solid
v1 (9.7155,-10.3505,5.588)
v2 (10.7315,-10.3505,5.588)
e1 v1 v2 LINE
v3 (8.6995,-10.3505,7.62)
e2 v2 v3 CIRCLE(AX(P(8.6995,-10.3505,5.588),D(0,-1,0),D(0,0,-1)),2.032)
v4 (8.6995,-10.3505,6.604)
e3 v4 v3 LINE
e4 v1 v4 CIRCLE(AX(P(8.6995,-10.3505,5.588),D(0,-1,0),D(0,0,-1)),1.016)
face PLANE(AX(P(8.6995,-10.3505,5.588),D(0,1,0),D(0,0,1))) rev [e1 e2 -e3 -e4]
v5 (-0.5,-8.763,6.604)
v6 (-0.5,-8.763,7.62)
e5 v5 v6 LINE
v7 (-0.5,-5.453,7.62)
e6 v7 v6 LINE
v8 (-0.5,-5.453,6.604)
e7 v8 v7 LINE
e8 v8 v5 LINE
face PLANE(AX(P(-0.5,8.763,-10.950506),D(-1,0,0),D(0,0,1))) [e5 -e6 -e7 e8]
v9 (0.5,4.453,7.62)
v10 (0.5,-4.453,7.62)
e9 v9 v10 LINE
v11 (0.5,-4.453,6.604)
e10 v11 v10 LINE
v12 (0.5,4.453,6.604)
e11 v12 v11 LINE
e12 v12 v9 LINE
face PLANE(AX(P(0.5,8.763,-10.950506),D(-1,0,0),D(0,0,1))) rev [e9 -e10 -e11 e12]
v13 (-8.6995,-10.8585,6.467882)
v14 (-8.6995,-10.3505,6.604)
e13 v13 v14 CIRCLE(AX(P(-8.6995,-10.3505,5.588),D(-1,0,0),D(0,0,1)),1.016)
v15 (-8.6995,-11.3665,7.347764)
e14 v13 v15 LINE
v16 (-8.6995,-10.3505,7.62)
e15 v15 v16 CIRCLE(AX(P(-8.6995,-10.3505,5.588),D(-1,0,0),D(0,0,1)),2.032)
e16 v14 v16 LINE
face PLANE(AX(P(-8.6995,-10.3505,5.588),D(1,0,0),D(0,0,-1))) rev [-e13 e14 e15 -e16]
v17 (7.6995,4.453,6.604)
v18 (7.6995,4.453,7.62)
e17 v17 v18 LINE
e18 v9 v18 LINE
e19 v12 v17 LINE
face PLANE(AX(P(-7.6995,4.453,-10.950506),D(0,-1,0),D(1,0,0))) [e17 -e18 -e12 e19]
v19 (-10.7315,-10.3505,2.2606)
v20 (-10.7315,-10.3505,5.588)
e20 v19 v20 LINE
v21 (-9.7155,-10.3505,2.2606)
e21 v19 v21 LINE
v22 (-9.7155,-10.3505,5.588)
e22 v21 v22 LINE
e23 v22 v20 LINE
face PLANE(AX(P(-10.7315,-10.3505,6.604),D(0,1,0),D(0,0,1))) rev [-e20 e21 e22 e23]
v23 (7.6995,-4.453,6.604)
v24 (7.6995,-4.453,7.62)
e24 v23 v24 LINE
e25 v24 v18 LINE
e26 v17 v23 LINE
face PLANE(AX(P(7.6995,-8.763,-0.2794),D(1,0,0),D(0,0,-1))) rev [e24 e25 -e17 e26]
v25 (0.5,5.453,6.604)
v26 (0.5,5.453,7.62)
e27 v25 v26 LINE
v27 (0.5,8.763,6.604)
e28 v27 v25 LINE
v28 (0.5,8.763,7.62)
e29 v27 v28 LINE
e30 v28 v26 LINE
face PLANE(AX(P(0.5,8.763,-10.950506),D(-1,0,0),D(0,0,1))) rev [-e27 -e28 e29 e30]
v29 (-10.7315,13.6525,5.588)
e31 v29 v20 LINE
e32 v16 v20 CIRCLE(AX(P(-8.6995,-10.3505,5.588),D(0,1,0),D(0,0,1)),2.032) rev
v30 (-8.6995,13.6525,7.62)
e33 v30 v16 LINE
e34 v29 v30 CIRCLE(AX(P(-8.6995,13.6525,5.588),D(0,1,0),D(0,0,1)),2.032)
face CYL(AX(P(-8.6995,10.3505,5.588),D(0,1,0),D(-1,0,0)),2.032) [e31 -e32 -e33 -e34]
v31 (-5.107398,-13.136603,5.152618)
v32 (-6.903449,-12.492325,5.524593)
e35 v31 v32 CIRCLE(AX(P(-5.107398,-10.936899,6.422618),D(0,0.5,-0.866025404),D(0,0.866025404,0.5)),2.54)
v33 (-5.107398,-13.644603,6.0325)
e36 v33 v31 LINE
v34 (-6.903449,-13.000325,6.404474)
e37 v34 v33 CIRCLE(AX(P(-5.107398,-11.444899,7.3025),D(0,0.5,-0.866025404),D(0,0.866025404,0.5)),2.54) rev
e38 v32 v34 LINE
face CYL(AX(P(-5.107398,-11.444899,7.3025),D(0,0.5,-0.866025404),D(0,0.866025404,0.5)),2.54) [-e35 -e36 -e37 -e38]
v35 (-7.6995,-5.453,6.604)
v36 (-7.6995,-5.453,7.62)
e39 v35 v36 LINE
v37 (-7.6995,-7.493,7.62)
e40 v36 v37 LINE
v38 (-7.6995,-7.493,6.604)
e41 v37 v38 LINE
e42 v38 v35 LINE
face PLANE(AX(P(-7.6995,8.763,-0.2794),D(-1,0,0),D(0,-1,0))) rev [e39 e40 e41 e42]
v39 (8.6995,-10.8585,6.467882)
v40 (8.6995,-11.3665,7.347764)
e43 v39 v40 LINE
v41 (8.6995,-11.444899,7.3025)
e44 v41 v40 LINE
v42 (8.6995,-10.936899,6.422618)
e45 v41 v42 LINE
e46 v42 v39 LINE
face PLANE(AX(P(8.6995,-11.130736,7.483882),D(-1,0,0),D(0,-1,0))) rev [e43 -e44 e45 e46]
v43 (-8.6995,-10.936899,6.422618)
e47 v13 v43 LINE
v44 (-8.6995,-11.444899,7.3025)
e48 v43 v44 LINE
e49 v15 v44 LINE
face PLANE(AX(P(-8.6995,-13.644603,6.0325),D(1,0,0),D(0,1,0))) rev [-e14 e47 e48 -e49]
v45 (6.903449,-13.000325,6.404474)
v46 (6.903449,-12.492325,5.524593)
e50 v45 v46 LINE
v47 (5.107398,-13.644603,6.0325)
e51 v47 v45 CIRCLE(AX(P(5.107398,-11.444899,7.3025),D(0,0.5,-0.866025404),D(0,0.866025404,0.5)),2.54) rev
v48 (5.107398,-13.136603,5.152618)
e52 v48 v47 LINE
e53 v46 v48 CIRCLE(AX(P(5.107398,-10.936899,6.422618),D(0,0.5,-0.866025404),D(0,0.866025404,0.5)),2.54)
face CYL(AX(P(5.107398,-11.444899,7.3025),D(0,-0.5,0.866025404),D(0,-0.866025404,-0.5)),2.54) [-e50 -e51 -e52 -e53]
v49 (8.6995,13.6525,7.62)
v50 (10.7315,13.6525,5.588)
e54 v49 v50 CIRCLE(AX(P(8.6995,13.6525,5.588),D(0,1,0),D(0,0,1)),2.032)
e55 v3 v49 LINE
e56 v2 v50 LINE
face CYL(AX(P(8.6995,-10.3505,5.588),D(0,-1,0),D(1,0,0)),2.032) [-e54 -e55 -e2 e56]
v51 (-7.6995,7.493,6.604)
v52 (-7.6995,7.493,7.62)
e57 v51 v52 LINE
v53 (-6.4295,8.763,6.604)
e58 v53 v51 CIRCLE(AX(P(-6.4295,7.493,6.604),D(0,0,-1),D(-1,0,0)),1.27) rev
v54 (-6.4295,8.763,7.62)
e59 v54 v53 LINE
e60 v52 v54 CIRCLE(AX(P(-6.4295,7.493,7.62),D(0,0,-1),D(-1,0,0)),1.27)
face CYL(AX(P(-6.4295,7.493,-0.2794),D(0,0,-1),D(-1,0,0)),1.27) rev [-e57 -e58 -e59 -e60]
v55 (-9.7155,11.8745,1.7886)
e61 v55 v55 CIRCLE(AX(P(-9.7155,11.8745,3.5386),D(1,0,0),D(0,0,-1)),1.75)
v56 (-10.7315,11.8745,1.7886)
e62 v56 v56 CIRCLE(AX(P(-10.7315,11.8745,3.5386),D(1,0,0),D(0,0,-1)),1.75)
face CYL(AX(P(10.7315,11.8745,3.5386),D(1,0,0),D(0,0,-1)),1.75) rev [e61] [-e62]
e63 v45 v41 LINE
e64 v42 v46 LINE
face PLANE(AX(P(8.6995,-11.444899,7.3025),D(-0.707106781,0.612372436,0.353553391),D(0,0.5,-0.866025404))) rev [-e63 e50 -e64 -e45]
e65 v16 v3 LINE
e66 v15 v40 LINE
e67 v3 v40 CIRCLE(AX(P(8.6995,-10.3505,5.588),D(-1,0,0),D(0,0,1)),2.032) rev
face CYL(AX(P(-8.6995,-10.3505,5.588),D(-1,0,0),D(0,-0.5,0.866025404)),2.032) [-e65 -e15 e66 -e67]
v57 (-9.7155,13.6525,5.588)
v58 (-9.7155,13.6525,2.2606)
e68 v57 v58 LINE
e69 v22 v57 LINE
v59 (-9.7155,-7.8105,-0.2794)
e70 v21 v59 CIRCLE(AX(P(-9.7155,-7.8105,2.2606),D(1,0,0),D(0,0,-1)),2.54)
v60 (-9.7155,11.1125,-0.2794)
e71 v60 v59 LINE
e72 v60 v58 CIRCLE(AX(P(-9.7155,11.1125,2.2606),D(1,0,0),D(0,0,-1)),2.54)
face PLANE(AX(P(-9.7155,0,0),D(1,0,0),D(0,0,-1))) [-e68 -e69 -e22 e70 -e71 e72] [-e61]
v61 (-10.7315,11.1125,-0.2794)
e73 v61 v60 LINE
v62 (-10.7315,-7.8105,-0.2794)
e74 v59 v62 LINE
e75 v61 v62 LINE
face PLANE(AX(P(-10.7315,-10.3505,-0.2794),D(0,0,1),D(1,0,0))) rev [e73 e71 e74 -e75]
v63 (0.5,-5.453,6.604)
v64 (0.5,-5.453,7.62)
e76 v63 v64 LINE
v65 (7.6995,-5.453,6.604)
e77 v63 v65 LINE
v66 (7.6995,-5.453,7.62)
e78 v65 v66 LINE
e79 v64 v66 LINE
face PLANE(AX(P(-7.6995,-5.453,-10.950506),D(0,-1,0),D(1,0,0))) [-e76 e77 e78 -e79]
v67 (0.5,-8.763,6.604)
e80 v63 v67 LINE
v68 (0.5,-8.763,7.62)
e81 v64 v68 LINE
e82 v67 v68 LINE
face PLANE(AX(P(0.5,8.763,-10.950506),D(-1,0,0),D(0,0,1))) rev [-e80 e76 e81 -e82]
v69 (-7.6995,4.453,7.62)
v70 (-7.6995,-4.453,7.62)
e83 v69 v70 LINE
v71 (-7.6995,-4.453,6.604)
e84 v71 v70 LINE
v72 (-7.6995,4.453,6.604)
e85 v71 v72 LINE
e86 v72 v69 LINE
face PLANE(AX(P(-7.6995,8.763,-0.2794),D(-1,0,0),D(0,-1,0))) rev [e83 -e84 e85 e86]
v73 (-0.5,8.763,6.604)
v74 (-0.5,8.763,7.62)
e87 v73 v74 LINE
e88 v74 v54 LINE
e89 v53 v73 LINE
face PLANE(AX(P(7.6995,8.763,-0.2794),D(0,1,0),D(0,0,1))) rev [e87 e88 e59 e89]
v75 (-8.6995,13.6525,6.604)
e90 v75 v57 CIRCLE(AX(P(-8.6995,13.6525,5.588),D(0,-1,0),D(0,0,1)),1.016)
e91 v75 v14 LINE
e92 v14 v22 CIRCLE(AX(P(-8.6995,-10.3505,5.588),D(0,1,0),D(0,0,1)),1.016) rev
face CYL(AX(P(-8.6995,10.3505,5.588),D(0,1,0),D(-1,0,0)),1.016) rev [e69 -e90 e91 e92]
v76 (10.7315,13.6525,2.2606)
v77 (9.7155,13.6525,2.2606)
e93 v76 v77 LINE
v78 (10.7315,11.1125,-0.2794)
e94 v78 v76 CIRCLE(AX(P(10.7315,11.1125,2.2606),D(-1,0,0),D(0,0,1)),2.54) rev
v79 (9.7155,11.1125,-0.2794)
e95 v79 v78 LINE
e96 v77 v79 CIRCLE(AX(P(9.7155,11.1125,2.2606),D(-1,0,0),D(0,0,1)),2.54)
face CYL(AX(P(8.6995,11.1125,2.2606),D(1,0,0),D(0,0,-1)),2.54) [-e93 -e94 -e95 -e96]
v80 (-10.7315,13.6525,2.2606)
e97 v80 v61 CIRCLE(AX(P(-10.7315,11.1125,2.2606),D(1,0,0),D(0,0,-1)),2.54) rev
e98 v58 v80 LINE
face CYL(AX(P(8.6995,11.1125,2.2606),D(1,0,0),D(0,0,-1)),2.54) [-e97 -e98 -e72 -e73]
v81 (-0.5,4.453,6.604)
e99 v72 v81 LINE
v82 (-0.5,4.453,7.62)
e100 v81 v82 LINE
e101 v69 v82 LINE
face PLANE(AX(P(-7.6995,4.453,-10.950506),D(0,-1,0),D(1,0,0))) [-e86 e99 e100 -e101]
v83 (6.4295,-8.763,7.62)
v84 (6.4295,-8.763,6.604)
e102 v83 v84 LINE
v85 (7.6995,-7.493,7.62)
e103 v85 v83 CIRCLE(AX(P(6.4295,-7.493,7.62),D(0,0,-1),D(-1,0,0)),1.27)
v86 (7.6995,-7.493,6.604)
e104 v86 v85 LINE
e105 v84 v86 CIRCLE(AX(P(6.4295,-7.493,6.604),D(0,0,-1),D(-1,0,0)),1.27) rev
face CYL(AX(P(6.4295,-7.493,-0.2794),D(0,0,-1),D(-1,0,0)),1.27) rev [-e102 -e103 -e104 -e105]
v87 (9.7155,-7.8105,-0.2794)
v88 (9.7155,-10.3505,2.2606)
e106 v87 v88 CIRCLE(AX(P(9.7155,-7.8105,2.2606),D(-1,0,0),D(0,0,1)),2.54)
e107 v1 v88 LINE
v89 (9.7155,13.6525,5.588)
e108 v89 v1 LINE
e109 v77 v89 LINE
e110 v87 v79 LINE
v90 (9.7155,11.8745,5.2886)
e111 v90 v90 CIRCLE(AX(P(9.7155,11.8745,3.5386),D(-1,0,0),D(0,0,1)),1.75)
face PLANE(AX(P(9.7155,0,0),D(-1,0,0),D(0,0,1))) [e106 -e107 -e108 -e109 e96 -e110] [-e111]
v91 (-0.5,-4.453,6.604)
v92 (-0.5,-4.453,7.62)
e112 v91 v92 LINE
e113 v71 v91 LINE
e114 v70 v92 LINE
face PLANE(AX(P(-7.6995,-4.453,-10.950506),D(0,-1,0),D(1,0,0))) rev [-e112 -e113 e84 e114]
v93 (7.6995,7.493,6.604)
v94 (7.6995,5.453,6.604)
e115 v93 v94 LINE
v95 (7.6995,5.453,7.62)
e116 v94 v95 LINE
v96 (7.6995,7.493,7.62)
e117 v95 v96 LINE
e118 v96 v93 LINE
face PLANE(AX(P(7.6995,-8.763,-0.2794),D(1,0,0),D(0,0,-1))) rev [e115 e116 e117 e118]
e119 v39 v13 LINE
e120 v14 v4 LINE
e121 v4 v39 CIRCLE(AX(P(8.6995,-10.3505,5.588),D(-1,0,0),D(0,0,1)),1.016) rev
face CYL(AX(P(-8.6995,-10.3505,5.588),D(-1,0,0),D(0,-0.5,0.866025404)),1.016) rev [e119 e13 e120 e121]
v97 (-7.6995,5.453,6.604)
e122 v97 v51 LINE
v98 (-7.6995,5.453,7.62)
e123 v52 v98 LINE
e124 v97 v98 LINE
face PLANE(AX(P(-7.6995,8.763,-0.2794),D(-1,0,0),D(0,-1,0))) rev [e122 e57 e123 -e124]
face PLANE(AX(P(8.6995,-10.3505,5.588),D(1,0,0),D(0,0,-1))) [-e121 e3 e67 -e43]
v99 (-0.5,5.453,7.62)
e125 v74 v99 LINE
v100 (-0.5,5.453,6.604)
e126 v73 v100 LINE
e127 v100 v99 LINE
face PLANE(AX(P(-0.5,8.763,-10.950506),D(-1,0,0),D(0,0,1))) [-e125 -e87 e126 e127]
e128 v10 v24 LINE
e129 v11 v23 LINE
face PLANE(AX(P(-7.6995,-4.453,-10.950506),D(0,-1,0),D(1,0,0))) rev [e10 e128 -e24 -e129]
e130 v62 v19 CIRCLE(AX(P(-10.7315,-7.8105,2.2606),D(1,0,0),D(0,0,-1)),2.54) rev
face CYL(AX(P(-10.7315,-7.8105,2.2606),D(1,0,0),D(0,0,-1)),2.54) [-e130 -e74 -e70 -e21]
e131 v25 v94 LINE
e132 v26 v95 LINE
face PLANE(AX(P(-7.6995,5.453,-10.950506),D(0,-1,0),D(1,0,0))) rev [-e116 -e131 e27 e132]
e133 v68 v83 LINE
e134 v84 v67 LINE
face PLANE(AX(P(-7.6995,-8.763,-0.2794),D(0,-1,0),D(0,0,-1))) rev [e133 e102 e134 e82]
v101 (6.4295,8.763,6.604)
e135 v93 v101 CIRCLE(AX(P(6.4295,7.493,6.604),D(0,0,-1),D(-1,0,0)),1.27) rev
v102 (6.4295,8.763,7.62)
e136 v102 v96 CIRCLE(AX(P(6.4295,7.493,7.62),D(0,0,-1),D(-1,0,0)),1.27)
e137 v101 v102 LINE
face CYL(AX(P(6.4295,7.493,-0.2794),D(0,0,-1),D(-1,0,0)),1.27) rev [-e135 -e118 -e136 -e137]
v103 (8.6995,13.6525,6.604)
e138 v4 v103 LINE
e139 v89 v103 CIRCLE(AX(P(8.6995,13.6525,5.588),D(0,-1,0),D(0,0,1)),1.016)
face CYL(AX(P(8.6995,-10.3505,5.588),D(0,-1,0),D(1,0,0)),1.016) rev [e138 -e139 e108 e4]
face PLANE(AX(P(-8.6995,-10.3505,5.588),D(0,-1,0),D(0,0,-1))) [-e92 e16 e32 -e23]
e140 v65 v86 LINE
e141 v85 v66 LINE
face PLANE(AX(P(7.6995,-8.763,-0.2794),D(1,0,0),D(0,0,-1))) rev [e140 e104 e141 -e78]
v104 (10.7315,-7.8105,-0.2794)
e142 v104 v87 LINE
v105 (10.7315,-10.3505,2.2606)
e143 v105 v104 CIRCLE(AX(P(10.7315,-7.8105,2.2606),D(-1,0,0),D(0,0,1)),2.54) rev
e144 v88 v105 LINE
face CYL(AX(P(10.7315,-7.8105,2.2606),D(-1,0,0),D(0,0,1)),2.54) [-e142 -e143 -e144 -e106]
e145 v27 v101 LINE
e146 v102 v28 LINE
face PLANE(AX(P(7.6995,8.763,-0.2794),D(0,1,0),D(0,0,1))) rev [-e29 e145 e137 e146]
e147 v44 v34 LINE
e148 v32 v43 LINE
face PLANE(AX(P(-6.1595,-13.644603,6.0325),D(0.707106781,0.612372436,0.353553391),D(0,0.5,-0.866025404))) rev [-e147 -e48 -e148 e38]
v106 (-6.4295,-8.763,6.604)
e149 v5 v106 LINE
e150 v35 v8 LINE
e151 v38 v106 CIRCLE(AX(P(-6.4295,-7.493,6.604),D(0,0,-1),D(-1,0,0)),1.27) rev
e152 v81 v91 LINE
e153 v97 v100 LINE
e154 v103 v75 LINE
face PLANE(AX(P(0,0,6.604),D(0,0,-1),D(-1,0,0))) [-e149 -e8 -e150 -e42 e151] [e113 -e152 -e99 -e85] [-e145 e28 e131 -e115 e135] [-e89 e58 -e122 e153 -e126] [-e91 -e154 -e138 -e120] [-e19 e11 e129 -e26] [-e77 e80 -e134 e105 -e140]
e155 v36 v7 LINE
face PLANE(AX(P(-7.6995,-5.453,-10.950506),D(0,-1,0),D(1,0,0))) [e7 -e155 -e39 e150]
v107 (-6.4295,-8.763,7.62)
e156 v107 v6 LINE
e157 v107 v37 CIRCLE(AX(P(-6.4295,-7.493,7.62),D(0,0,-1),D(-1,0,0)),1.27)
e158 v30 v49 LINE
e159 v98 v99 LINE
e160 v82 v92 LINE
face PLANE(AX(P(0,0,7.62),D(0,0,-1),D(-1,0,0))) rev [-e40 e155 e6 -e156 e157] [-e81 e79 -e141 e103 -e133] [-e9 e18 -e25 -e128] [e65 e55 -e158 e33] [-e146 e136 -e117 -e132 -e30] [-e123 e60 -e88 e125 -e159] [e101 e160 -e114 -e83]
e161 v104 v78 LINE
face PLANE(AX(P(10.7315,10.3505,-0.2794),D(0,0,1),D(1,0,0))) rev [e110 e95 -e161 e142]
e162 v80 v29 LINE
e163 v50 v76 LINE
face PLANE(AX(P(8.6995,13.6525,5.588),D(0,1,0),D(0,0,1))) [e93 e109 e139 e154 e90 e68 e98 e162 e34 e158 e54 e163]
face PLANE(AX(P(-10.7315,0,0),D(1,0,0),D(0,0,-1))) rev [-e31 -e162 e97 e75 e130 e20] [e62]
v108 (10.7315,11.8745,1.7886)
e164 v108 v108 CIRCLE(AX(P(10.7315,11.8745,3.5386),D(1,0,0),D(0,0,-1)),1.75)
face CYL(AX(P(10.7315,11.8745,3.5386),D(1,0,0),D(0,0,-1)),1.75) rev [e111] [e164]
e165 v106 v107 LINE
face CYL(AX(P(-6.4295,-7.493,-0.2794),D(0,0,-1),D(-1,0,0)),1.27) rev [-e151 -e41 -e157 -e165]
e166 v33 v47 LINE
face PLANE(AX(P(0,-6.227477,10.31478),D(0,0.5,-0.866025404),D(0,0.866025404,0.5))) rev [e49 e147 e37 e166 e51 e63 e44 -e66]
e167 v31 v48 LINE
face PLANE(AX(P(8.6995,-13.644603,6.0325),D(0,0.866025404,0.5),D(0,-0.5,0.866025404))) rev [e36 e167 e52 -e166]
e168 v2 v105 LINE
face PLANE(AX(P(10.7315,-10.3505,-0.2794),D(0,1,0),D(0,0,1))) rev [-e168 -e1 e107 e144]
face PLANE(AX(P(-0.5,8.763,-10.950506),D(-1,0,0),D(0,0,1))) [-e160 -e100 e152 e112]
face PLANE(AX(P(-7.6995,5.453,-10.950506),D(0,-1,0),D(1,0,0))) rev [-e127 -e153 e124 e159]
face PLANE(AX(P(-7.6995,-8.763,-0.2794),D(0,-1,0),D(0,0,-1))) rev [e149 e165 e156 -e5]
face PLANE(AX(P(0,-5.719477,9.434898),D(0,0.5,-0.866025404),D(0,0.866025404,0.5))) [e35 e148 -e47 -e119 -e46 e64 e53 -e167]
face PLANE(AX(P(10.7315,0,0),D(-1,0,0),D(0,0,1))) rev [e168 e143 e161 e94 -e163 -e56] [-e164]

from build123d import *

# Parameters (mm, degrees)
SKETCH1_W                      = 20.955
SKETCH1_H                      = 20.701
BOSS_EXTRUDE1_DEPTH            = 7.62
FILLET3_R                      = 0.762
SHELL1_T                       = -1.016
SKETCH3_W                      = 18.923
SKETCH3_H                      = 1.016
CUT_EXTRUDE1_DEPTH             = 6.604
CONVERT_SOLID1_START           = -10.4775
CONVERT_SOLID1_OUTLINE_W       = 20.701
CONVERT_SOLID1_OUTLINE_H       = 6.604
CONVERT_SOLID1_DEPTH           = 20.955
CONVERT_SOLID1_2_OUTLINE_W     = 20.701
CONVERT_SOLID1_2_OUTLINE_H     = 1.016
CONVERT_SOLID1_2_DEPTH         = 0.762
CONVERT_SOLID1_START_2         = 9.7155
CONVERT_SOLID1_3_OUTLINE_W     = 20.701
CONVERT_SOLID1_3_OUTLINE_H     = 1.016
CONVERT_SOLID1_3_DEPTH         = 0.762
EDGE_FLANGE1_STRIP_W           = 6.096
EDGE_FLANGE1_STRIP_H           = 1.016
EDGE_FLANGE1_STRIP_CUT_DEPTH   = 20.701
EDGE_FLANGE1_STRIP_2_W         = 6.096
EDGE_FLANGE1_STRIP_2_H         = 1.016
EDGE_FLANGE1_STRIP_CUT_2_DEPTH = 20.701
EDGE_FLANGE1_DEPTH             = 20.701
EDGE_FLANGE1_BEND_DEPTH        = 20.701
EDGE_FLANGE2_DEPTH             = 17.399
CHAMFER1_SIZE                  = 2.54
SKETCH23_W                     = 15.399
SKETCH23_H                     = 17.526
CUT_EXTRUDE2_DEPTH             = 20.071990326
FILLET5_R                      = 1.27
SKETCH24_W                     = 1
SKETCH24_H                     = 17.526
SKETCH24_W_2                   = 15.399
SKETCH24_H_2                   = 1
EXTRUDE_THIN1_DEPTH            = 1.016
BOSS_EXTRUDE2_DEPTH            = 3.302
FILLET4_R                      = 2.54
F_3_5_3_5_DIAMETER_HOLE1_D     = 3.5
FILLET6_R                      = 2.54


with BuildPart() as part:
    # Sketch1 → Boss-Extrude1 (new body)
    with BuildSketch(Plane.XY):
        Rectangle(SKETCH1_W, SKETCH1_H)
    extrude(amount=BOSS_EXTRUDE1_DEPTH)

    # Fillet3
    fillet3_edges = [part.edges().sort_by_distance(p)[0] for p in [
        (10.4775, 0, 7.62),
        (-10.4775, 0, 7.62),
    ]]
    fillet(fillet3_edges, radius=FILLET3_R)

    # Shell1
    shell1_openings = [part.faces().sort_by_distance(p)[0] for p in [
        (0, 0, 0),
    ]]
    offset(amount=SHELL1_T, openings=shell1_openings, kind=Kind.INTERSECTION)

    # Sketch3 → Cut-Extrude1 (cut)
    with BuildSketch(Plane(origin=(0, 0, 0), x_dir=(-1, 0, 0), z_dir=(0, 0, -1))):
        with Locations((0, -9.8425)):
            Rectangle(SKETCH3_W, SKETCH3_H)
    extrude(amount=-CUT_EXTRUDE1_DEPTH, mode=Mode.SUBTRACT)

    # Convert-Solid1: read off the stored shape, not the designer's step
    # Convert-Solid1 outline → Convert-Solid1 (cut)
    with BuildSketch(Plane.YZ.offset(CONVERT_SOLID1_START)):
        with Locations((0, 3.302)):
            Rectangle(CONVERT_SOLID1_OUTLINE_W, CONVERT_SOLID1_OUTLINE_H)
    extrude(amount=CONVERT_SOLID1_DEPTH, mode=Mode.SUBTRACT)

    # Convert-Solid1 2 outline → Convert-Solid1 2 (cut)
    with BuildSketch(Plane.YZ.offset(CONVERT_SOLID1_START)):
        with Locations((0, 7.112)):
            Rectangle(CONVERT_SOLID1_2_OUTLINE_W, CONVERT_SOLID1_2_OUTLINE_H)
    extrude(amount=CONVERT_SOLID1_2_DEPTH, mode=Mode.SUBTRACT)

    # Convert-Solid1 3 outline → Convert-Solid1 3 (cut)
    with BuildSketch(Plane.YZ.offset(CONVERT_SOLID1_START_2)):
        with Locations((0, 7.112)):
            Rectangle(CONVERT_SOLID1_3_OUTLINE_W, CONVERT_SOLID1_3_OUTLINE_H)
    extrude(amount=CONVERT_SOLID1_3_DEPTH, mode=Mode.SUBTRACT)

    # Edge-Flange1: sheet metal written as solids
    # Edge-Flange1 strip (on a plane across the edge) → Edge-Flange1 strip cut (cut)
    with BuildSketch(Plane(origin=(9.7155, 10.3505, 6.604), x_dir=(-1, 0, 0), z_dir=(0, -1, 0))):
        with Locations((-2.032, -0.508)):
            Rectangle(EDGE_FLANGE1_STRIP_W, EDGE_FLANGE1_STRIP_H)
    extrude(amount=EDGE_FLANGE1_STRIP_CUT_DEPTH, mode=Mode.SUBTRACT)

    # Edge-Flange1 strip 2 (on a plane across the edge) → Edge-Flange1 strip cut 2 (cut)
    with BuildSketch(Plane(origin=(-9.7155, -10.3505, 6.604), x_dir=(1, 0, 0), z_dir=(0, 1, 0))):
        with Locations((-2.032, -0.508)):
            Rectangle(EDGE_FLANGE1_STRIP_2_W, EDGE_FLANGE1_STRIP_2_H)
    extrude(amount=EDGE_FLANGE1_STRIP_CUT_2_DEPTH, mode=Mode.SUBTRACT)

    # Edge-Flange1 section (on a plane across the edge) → Edge-Flange1 (add)
    with BuildSketch(Plane(origin=(9.7155, 10.3505, 6.604), x_dir=(-1, 0, 0), z_dir=(0, -1, 0))):
        with BuildLine():
            Line((-1.016, 1.016), (-1.016, 6.8834))
            Line((-1.016, 6.8834), (0, 6.8834))
            Line((0, 6.8834), (0, 1.016))
            ThreePointArc((0, 1.016), (0.29757951, 0.29757951), (1.016, 0))
            Line((1.016, 0), (1.016, -1.016))
            ThreePointArc((1.016, -1.016), (-0.420840979, -0.420840979), (-1.016, 1.016))
        make_face()
    extrude(amount=EDGE_FLANGE1_DEPTH)

    # Edge-Flange1 section 2 (on a plane across the edge) → Edge-Flange1 bend (add)
    with BuildSketch(Plane(origin=(-9.7155, -10.3505, 6.604), x_dir=(1, 0, 0), z_dir=(0, 1, 0))):
        with BuildLine():
            Line((-1.016, 1.016), (-1.016, 6.8834))
            Line((-1.016, 6.8834), (0, 6.8834))
            Line((0, 6.8834), (0, 1.016))
            ThreePointArc((0, 1.016), (0.29757951, 0.29757951), (1.016, 0))
            Line((1.016, 0), (1.016, -1.016))
            ThreePointArc((1.016, -1.016), (-0.420840979, -0.420840979), (-1.016, 1.016))
        make_face()
    extrude(amount=EDGE_FLANGE1_BEND_DEPTH)

    # Edge-Flange2: sheet metal written as solids
    # Edge-Flange2 section (on a plane across the edge) → Edge-Flange2 (add)
    with BuildSketch(Plane(origin=(8.6995, -10.62273638, 6.604), x_dir=(0, 0.49999999999999495, -0.8660254037844416), z_dir=(-1, 0, 0))):
        with BuildLine():
            Line((-1.016, 0.27223638), (-1.016, 2.90276362))
            Line((-1.016, 2.90276362), (0, 2.90276362))
            Line((0, 2.90276362), (0, 0.27223638))
            ThreePointArc((0, 0.27223638), (0.03461936, 0.00927623), (0.13611819, -0.23576362))
            Line((0.13611819, -0.23576362), (-0.74376362, -0.74376362))
            ThreePointArc((-0.74376362, -0.74376362), (-0.946761279, -0.25368392), (-1.016, 0.27223638))
        make_face()
    extrude(amount=EDGE_FLANGE2_DEPTH)

    # Chamfer1
    chamfer1_edges = [part.edges().sort_by_distance(p)[0] for p in [
        (8.6995, -13.390603416, 5.592559095),
        (-8.6995, -13.390603416, 5.592559095),
    ]]
    chamfer(chamfer1_edges, length=CHAMFER1_SIZE)

    # Sketch23 → Cut-Extrude2 (cut, through all)
    with BuildSketch(Plane.XY.offset(7.62)):
        Rectangle(SKETCH23_W, SKETCH23_H)
    extrude(amount=-CUT_EXTRUDE2_DEPTH, mode=Mode.SUBTRACT)

    # Fillet5
    fillet5_edges = [part.edges().sort_by_distance(p)[0] for p in [
        (-7.6995, 8.763, 7.112),
        (7.6995, 8.763, 7.112),
        (7.6995, -8.763, 7.112),
        (-7.6995, -8.763, 7.112),
    ]]
    fillet(fillet5_edges, radius=FILLET5_R)

    # Sketch24 → Extrude-Thin1 (add)
    with BuildSketch(Plane.XY.offset(7.62)):
        Rectangle(SKETCH24_W, SKETCH24_H)
        with Locations((0, -4.953)):
            Rectangle(SKETCH24_W_2, SKETCH24_H_2)
        with Locations((0, 4.953)):
            Rectangle(SKETCH24_W_2, SKETCH24_H_2)
    extrude(amount=-EXTRUDE_THIN1_DEPTH)

    # Sketch25 → Boss-Extrude2 (add)
    with BuildSketch(Plane(origin=(0, 10.3505, 0), x_dir=(1, 0, 0), z_dir=(0, 1, 0))):
        with BuildLine():
            Line((10.7315, -5.588), (10.7315, 0.2794))
            Line((10.7315, 0.2794), (9.7155, 0.2794))
            Line((9.7155, 0.2794), (9.7155, -5.588))
            ThreePointArc((9.7155, -5.588), (9.41792049, -6.30642049), (8.6995, -6.604))
            Line((8.6995, -6.604), (-8.6995, -6.604))
            ThreePointArc((-8.6995, -6.604), (-9.41792049, -6.30642049), (-9.7155, -5.588))
            Line((-9.7155, -5.588), (-9.7155, 0.2794))
            Line((-9.7155, 0.2794), (-10.7315, 0.2794))
            Line((-10.7315, 0.2794), (-10.7315, -5.588))
            ThreePointArc((-10.7315, -5.588), (-10.136340979, -7.024840979), (-8.6995, -7.62))
            Line((-8.6995, -7.62), (8.6995, -7.62))
            ThreePointArc((8.6995, -7.62), (10.136340979, -7.024840979), (10.7315, -5.588))
        make_face()
    extrude(amount=BOSS_EXTRUDE2_DEPTH)

    # Fillet4
    fillet4_edges = [part.edges().sort_by_distance(p)[0] for p in [
        (10.2235, 13.6525, -0.2794),
        (-10.2235, 13.6525, -0.2794),
        (10.2235, -10.3505, -0.2794),
        (-10.2235, -10.3505, -0.2794),
    ]]
    fillet(fillet4_edges, radius=FILLET4_R)

    # Ø3.5 (3.5) Diameter Hole1 (through all)
    with Locations(Plane(origin=(10.7315, 0, 0), x_dir=(0, 0, -1), z_dir=(1, 0, 0))):
        with Locations((-3.5386, 11.8745)):
            Hole(F_3_5_3_5_DIAMETER_HOLE1_D / 2)

    # Fillet6
    fillet6_edges = [part.edges().sort_by_distance(p)[0] for p in [
        (-6.1595, -13.390603416, 5.592559095),
        (6.1595, -13.390603416, 5.592559095),
    ]]
    fillet(fillet6_edges, radius=FILLET6_R)


solid = part.part
